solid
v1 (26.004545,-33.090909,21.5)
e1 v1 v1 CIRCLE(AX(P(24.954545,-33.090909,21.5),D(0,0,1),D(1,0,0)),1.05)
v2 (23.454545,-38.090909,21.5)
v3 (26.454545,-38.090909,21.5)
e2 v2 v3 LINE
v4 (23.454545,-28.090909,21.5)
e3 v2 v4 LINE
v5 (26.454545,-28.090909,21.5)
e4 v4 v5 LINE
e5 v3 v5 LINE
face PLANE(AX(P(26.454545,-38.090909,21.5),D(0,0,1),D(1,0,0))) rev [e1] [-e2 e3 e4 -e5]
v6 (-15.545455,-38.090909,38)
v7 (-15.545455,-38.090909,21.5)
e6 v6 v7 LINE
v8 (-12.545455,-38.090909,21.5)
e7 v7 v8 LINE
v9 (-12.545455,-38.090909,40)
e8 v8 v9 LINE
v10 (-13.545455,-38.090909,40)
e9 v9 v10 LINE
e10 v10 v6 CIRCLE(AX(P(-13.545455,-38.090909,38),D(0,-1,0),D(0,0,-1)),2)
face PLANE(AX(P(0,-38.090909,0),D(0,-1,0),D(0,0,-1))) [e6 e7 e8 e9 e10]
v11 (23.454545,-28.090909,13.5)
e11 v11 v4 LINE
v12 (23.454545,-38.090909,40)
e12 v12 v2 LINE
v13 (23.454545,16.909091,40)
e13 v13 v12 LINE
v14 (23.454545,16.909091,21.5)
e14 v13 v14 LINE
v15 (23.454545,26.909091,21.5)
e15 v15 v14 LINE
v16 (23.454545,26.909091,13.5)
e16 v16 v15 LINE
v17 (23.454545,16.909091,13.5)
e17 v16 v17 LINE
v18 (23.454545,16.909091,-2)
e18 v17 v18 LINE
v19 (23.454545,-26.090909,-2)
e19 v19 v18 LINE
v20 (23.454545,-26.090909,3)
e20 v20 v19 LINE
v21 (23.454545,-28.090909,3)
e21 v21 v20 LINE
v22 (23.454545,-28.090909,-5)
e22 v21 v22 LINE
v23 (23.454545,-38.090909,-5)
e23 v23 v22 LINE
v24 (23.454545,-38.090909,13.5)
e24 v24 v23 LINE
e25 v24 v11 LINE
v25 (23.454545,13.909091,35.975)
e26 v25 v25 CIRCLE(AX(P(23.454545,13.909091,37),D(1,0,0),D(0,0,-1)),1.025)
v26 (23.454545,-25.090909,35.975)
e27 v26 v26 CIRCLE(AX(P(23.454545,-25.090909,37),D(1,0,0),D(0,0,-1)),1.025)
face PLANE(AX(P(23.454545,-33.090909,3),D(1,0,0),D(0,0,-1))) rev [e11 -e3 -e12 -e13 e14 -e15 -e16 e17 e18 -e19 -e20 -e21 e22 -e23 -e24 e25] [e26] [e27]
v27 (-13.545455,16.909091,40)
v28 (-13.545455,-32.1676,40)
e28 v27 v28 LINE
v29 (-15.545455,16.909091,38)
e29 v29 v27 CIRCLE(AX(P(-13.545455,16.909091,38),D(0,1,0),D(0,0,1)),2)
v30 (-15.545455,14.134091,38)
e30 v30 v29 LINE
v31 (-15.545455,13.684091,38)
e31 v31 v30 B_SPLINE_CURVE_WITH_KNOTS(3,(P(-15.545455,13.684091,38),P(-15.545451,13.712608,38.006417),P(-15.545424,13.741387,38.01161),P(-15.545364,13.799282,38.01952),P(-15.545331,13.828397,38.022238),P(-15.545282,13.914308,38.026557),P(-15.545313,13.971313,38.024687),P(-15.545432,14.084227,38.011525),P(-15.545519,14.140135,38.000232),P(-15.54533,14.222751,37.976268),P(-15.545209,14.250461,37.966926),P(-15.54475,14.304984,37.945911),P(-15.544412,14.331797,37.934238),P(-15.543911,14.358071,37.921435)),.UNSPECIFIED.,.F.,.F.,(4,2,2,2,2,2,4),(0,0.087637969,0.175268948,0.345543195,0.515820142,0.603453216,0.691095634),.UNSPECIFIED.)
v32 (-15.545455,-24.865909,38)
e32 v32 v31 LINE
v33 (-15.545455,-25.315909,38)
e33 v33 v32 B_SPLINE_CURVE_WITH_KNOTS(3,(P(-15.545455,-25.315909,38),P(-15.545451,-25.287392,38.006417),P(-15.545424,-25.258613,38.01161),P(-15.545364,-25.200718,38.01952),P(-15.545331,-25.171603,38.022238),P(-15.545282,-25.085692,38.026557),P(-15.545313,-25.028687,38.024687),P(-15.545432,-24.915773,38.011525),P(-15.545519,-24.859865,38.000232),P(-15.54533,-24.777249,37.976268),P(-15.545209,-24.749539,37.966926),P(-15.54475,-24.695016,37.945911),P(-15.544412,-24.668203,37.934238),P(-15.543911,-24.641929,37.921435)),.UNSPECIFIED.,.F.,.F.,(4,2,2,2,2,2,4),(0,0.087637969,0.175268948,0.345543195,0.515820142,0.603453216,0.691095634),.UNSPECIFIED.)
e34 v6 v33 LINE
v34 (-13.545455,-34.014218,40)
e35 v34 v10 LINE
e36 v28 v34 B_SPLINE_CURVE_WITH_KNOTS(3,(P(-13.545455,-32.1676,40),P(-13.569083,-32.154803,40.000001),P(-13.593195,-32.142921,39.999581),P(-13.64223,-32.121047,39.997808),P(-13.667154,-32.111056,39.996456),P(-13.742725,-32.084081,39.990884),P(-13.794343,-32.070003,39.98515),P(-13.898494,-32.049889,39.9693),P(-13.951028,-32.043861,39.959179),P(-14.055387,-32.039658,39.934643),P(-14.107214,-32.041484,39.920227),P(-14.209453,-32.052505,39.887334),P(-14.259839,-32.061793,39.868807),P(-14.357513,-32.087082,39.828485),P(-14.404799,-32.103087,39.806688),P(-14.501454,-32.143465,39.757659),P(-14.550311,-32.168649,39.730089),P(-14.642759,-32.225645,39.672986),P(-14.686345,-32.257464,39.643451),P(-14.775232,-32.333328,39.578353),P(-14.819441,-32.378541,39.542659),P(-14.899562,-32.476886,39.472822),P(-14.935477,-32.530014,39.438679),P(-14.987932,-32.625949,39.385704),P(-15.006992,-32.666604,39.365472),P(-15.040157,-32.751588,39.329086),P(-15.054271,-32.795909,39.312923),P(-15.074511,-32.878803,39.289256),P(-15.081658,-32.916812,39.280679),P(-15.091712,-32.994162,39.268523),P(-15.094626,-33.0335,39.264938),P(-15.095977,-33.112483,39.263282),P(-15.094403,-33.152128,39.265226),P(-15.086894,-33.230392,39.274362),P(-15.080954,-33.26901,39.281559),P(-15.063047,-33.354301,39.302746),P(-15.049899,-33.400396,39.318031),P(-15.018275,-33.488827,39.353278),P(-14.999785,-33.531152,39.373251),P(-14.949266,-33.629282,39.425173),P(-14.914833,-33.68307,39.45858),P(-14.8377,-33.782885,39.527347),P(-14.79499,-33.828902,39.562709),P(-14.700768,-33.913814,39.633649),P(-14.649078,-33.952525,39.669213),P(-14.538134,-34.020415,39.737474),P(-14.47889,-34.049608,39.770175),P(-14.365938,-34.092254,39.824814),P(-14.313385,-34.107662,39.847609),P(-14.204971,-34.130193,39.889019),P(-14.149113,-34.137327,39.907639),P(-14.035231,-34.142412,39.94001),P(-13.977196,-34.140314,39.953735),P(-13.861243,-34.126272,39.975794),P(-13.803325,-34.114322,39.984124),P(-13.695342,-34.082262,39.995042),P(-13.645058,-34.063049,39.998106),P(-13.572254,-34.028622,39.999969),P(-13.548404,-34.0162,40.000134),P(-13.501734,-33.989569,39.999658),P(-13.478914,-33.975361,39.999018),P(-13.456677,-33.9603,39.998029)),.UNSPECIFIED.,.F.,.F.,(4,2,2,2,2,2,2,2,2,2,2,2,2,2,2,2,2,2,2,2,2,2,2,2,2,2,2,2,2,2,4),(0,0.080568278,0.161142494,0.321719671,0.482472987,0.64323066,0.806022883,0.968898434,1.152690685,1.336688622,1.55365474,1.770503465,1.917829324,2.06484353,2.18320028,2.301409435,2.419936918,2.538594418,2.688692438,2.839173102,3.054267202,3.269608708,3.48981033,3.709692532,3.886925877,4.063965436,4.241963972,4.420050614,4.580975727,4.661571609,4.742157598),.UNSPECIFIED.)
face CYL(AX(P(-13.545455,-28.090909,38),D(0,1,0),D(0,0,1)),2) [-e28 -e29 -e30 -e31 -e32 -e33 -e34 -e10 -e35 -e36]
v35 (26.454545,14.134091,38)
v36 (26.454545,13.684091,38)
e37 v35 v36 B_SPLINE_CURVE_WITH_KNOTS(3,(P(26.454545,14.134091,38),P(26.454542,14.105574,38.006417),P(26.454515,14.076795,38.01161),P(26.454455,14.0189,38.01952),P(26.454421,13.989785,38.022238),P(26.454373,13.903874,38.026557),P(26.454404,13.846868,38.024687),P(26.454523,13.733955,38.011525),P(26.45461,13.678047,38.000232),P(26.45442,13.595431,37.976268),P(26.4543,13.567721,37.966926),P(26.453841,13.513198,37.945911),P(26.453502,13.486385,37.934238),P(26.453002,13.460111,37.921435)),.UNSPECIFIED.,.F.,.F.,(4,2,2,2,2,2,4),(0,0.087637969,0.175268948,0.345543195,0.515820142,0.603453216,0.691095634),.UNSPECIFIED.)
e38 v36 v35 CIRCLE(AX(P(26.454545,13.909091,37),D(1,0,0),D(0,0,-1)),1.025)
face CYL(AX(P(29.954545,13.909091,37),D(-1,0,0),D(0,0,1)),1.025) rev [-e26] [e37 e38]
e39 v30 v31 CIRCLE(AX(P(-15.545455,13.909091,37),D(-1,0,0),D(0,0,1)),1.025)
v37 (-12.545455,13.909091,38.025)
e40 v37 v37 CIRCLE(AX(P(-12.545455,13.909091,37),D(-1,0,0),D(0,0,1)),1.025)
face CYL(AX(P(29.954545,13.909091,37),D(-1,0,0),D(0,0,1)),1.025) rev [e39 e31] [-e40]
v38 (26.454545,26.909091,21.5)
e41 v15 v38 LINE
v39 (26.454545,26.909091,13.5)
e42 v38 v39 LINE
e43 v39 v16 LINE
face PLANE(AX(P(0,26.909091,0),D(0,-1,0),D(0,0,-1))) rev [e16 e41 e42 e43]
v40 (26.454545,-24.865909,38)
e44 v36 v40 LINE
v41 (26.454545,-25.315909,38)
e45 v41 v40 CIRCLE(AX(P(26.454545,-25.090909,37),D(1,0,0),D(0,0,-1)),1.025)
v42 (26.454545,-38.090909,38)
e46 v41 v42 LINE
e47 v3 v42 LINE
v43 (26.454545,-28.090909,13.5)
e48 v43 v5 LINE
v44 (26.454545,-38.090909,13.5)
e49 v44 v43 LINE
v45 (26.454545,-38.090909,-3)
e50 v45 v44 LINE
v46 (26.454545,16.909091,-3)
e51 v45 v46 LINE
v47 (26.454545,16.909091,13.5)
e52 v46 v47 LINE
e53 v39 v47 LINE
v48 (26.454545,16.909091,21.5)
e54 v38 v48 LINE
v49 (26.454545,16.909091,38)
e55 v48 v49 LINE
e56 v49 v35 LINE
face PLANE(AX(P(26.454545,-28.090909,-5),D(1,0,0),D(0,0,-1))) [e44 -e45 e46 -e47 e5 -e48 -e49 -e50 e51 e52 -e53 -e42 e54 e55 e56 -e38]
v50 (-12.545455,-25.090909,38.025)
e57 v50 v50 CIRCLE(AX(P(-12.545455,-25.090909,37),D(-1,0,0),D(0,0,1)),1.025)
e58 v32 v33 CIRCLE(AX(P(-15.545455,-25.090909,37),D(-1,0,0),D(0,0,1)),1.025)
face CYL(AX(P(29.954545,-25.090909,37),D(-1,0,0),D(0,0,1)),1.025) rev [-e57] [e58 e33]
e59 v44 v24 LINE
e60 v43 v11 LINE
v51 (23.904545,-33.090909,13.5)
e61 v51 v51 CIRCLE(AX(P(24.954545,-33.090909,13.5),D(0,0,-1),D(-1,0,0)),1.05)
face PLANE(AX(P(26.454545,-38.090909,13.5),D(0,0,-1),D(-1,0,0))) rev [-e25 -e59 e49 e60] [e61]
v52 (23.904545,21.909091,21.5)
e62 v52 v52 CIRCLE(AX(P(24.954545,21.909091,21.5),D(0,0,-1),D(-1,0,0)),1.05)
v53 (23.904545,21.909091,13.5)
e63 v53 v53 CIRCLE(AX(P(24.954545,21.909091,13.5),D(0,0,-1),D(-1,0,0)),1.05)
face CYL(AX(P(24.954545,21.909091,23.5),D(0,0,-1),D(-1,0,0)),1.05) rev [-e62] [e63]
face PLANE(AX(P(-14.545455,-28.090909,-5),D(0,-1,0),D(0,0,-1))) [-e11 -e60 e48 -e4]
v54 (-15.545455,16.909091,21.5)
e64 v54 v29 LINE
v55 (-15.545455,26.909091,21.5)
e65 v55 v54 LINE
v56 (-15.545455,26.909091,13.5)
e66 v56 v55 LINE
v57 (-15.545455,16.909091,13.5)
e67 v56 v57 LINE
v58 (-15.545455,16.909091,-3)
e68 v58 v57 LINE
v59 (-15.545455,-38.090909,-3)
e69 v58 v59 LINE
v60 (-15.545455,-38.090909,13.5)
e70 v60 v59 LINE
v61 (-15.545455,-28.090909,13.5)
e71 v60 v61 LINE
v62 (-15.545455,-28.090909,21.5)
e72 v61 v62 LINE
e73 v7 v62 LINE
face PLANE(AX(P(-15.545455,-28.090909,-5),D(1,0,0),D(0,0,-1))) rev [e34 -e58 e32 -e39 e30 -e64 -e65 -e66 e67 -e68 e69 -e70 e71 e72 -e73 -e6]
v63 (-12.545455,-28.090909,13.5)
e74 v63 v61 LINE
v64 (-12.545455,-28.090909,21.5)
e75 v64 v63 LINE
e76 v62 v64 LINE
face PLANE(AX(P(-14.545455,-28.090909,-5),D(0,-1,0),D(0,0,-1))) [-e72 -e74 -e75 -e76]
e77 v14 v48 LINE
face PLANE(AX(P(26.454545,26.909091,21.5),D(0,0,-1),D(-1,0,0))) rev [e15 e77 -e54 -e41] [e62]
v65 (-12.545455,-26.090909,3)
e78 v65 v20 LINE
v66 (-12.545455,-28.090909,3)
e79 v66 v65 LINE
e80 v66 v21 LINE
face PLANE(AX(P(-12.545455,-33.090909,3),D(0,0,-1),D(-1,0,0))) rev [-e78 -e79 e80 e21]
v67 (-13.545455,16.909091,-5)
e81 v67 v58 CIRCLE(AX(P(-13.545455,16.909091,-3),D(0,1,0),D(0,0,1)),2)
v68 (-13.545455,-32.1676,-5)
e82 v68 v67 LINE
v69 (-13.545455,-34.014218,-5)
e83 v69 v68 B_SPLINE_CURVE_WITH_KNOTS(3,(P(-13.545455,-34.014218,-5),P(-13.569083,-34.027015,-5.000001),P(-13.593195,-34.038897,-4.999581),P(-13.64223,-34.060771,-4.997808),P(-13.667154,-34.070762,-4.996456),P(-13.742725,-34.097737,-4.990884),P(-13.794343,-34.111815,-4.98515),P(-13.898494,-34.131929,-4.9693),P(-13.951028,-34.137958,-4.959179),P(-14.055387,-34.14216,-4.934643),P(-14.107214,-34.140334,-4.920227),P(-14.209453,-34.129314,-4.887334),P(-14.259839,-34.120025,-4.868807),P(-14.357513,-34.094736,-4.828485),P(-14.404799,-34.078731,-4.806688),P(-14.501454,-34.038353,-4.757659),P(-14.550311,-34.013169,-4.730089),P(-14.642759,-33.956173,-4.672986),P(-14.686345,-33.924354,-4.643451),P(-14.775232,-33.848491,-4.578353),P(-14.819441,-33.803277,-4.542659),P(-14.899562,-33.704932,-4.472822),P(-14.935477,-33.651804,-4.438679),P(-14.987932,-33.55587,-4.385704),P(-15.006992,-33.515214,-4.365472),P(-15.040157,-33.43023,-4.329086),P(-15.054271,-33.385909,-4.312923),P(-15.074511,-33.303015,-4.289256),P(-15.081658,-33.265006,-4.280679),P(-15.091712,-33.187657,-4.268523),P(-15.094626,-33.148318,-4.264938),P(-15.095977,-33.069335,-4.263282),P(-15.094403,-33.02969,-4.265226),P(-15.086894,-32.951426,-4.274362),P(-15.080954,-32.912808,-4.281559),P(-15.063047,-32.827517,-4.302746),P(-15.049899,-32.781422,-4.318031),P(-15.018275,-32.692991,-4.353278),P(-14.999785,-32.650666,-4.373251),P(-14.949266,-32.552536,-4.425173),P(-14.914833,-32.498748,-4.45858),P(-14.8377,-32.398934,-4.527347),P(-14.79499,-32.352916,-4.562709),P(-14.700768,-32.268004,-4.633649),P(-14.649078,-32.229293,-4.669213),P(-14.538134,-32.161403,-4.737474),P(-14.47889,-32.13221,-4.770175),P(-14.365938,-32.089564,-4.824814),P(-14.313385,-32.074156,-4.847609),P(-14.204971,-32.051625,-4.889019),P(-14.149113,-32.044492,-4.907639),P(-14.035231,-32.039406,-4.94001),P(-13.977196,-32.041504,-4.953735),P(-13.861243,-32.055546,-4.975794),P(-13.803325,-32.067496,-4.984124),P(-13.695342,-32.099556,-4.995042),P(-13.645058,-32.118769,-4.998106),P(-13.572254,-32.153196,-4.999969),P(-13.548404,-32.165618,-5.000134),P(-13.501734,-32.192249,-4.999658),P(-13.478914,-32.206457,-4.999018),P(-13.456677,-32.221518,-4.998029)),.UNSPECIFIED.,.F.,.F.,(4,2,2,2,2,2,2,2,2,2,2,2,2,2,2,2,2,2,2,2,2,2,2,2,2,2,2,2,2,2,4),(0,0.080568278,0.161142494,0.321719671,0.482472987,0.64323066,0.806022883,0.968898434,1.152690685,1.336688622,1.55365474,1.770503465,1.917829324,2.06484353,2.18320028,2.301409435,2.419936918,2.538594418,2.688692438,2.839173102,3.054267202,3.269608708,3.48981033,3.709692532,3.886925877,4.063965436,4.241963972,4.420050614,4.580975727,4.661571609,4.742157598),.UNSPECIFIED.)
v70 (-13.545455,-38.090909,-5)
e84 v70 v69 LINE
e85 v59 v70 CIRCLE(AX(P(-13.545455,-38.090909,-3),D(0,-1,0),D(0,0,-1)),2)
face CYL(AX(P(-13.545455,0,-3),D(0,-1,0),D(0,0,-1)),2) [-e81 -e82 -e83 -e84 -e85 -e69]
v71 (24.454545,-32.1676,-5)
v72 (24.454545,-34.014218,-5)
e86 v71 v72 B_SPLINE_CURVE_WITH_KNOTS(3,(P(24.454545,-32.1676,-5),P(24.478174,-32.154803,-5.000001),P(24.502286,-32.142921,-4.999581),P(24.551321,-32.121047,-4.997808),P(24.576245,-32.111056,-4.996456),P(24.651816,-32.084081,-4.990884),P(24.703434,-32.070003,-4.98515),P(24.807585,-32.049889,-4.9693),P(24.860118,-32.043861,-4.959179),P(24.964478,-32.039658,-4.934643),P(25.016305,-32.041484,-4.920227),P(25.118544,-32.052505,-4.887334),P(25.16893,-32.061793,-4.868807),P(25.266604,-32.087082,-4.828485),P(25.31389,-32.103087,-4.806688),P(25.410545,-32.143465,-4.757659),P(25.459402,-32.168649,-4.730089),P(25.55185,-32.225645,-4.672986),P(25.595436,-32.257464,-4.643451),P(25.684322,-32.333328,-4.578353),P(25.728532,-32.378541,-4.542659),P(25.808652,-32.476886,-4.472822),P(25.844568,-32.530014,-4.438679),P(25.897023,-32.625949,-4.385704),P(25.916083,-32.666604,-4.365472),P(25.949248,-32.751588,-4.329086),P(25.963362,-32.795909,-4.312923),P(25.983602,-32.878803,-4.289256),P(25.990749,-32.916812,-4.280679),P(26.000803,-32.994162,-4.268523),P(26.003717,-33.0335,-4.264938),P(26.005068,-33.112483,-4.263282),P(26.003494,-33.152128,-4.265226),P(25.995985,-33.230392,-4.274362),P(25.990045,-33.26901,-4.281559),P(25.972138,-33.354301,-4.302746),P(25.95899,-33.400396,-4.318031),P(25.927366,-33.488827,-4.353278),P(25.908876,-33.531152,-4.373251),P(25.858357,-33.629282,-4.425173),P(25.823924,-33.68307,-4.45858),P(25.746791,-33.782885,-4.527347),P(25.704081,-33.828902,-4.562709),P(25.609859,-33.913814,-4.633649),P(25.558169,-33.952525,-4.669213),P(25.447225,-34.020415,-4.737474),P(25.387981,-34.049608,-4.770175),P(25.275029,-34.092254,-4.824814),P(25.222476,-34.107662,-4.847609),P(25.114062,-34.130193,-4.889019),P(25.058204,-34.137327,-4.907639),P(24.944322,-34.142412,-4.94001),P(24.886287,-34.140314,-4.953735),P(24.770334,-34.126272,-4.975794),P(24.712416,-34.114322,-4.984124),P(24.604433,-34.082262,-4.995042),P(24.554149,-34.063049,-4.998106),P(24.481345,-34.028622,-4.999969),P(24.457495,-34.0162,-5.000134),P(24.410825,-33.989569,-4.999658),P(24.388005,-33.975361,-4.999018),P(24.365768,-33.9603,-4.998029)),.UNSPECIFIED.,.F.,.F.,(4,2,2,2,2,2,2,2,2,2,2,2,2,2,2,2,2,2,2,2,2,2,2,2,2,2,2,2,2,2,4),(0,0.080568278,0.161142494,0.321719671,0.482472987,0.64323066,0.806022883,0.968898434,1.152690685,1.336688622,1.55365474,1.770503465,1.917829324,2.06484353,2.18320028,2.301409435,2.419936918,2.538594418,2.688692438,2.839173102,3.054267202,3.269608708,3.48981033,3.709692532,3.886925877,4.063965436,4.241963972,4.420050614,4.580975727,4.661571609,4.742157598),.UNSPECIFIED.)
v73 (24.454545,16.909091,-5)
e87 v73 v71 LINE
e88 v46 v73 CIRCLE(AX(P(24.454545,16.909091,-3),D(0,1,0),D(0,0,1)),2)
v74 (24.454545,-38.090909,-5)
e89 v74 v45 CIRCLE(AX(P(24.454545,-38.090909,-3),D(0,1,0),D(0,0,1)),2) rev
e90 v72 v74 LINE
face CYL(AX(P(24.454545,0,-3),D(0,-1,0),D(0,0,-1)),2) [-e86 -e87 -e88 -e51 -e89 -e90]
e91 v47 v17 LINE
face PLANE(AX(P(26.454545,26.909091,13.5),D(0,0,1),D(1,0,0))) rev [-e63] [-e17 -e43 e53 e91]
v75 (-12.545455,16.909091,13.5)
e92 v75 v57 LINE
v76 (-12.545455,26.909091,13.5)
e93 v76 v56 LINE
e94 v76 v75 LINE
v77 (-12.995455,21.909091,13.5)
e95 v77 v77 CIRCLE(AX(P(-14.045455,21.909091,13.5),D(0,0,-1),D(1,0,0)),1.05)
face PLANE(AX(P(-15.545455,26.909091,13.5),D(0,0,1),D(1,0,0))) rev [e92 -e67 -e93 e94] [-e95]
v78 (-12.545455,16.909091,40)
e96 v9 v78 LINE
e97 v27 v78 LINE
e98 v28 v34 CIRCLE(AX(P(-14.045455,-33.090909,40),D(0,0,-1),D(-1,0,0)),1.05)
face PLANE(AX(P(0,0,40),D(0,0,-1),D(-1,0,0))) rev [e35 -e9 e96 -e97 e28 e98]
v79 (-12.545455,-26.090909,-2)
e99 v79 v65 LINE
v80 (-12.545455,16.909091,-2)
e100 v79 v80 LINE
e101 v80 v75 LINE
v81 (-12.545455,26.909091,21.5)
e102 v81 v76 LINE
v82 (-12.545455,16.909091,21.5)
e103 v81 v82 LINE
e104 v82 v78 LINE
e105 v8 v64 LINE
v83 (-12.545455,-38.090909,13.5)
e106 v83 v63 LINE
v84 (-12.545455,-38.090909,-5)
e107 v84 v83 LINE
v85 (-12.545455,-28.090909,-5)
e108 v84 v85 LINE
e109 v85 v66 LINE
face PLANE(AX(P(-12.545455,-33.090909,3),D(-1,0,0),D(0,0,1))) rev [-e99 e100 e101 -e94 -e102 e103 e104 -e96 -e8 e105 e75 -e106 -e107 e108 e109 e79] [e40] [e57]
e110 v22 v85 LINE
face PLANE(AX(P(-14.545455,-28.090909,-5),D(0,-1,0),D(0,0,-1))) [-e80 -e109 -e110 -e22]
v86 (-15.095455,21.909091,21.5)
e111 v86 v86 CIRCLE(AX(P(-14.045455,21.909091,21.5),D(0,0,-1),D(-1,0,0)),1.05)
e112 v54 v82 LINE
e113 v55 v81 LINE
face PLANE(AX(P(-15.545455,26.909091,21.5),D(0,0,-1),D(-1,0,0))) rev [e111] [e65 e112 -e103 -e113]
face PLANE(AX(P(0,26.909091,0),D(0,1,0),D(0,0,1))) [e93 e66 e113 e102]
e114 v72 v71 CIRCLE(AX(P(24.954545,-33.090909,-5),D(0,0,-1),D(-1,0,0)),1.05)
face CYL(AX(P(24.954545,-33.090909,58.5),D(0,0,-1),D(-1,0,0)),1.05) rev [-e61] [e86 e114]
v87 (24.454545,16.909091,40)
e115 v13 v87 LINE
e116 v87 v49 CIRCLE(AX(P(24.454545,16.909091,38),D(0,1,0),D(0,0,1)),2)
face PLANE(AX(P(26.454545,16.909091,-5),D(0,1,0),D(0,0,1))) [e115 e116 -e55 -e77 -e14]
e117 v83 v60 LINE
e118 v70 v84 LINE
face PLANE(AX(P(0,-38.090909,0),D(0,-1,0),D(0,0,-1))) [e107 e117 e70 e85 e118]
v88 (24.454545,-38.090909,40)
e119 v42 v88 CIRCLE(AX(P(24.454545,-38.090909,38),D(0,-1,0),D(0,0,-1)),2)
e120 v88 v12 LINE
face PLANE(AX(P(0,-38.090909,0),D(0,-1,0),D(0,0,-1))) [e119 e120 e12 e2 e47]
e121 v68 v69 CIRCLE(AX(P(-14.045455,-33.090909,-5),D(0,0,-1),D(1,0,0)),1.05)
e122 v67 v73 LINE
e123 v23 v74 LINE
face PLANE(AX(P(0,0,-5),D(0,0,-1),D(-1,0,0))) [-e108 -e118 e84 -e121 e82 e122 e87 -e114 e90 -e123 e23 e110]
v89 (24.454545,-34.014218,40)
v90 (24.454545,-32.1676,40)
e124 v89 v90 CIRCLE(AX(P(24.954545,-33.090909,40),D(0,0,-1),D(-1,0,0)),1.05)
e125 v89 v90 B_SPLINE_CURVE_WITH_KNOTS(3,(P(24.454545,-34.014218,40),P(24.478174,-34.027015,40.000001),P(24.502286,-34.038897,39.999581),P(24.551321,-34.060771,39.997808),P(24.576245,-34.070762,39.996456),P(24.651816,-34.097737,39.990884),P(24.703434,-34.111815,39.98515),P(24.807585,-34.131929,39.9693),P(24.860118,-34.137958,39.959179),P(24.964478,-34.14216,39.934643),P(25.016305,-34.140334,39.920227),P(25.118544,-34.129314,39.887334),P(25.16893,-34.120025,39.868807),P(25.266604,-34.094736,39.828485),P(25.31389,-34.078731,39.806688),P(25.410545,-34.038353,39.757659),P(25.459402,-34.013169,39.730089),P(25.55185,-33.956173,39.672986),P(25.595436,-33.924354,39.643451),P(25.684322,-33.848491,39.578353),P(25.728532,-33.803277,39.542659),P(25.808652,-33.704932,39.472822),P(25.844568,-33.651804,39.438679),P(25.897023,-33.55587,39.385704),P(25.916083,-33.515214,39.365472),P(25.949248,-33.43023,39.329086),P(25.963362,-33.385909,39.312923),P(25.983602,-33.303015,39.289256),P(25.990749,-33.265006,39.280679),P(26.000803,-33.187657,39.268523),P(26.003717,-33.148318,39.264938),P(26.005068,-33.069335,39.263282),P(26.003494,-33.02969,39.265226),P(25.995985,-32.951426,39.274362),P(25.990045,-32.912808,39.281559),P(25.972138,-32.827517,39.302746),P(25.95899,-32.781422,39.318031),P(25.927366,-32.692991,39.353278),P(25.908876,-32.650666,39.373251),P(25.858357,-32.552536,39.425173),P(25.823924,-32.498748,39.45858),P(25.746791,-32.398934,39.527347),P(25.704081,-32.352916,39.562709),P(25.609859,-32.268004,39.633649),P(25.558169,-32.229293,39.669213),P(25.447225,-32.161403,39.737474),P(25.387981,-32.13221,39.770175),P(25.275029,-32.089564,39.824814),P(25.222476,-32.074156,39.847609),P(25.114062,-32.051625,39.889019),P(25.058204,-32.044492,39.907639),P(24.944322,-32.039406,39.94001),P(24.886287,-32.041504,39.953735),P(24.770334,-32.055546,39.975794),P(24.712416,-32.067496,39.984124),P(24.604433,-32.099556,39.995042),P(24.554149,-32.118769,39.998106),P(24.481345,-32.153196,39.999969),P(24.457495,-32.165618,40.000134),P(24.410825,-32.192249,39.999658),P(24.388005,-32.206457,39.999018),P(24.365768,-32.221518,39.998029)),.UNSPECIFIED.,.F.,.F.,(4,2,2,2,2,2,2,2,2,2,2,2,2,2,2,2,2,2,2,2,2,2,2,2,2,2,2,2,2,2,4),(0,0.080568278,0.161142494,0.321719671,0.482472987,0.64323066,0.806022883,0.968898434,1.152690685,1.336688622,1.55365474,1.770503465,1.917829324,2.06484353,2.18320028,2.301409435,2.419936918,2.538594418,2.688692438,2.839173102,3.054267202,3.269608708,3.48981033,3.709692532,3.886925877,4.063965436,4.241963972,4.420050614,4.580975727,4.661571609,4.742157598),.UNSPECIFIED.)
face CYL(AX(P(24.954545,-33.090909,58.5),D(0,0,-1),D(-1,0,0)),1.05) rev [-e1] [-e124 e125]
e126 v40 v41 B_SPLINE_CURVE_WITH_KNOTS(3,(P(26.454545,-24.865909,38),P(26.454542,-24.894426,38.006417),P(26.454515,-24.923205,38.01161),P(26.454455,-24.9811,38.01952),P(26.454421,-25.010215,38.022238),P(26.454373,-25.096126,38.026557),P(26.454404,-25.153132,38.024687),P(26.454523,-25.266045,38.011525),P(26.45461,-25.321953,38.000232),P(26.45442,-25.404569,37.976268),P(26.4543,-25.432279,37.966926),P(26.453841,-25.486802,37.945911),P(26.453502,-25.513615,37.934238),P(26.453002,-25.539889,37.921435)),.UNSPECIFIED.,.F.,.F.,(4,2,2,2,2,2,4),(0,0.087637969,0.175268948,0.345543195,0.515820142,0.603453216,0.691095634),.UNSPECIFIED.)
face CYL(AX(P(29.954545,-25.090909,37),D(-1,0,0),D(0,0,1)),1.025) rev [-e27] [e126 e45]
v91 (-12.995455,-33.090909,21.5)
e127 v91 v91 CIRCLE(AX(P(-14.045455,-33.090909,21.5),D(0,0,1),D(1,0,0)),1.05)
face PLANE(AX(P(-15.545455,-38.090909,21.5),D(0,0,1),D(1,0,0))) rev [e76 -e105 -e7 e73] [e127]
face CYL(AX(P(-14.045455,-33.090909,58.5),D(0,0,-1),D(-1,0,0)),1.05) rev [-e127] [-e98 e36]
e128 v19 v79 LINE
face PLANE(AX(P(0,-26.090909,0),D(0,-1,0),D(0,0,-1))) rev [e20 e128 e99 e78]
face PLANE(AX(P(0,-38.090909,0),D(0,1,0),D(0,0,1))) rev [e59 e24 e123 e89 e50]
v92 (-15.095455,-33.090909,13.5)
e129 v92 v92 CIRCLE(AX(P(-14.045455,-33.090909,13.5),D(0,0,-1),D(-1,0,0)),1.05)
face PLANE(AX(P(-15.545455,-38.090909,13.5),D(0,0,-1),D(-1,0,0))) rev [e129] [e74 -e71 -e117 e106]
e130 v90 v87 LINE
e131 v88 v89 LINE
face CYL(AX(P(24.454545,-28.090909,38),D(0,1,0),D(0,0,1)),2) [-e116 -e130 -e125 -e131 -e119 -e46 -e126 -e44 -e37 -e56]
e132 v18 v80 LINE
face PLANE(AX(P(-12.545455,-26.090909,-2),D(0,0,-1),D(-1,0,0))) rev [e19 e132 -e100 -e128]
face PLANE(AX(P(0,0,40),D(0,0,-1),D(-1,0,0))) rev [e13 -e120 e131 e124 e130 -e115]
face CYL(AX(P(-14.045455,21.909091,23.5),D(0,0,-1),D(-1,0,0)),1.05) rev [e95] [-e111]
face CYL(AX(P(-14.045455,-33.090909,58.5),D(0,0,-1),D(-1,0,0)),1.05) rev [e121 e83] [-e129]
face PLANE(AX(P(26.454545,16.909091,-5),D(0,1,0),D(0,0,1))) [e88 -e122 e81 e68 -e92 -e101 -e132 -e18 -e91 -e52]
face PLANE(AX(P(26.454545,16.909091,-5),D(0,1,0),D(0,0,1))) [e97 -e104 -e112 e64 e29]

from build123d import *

# Parameters (mm, degrees)
EXTRUDE_1_DEPTH      = 40
EXTRUDE_1_DEPTH_BACK = 5
SKETCH_2_W           = 36
SKETCH_2_H           = 37
CUT_EXTRUDE_1_DEPTH  = 50
SKETCH_5_W           = 36
SKETCH_5_H           = 5
CUT_EXTRUDE_4_DEPTH  = 43
SKETCH_9_R           = 1.025
CUT_EXTRUDE_5_DEPTH  = 45.5
SKETCH_10_W          = 3
SKETCH_10_H          = 8
EXTRUDE_4_DEPTH      = 10
SKETCH_11_W          = 3
SKETCH_11_H          = 18.5
EXTRUDE_5_DEPTH      = 10
SKETCH_12_R          = 1.05
CUT_EXTRUDE_6_DEPTH  = 10
SKETCH_13_R          = 1.05
CUT_EXTRUDE_7_DEPTH  = 63.5
FILLET_4_R           = 2
FILLET_5_R           = 2
FILLET_6_R           = 2
FILLET_7_R           = 2


with BuildPart() as part:
    # 草圖1 → 填料-伸長1 (new, two sides: drawn at the far end of the back side and taken through both)
    with BuildSketch(Plane.XY.offset(-EXTRUDE_1_DEPTH_BACK)):
        Polygon((-14.545454545, -28.090909091), (-15.545454545, -28.090909091), (-15.545454545, 16.909090909), (-14.545454545, 16.909090909), (25.454545455, 16.909090909), (26.454545455, 16.909090909), (26.454545455, -28.090909091), (25.454545455, -28.090909091), align=None)
    extrude(amount=EXTRUDE_1_DEPTH + EXTRUDE_1_DEPTH_BACK)

    # 草圖2 → 除料-伸長1 (cut)
    with BuildSketch(Plane(origin=(0, 16.909090909, 0), x_dir=(1, 0, 0), z_dir=(0, 1, 0))):
        with Locations((5.454545455, -21.5)):
            Rectangle(SKETCH_2_W, SKETCH_2_H)
    extrude(amount=-CUT_EXTRUDE_1_DEPTH, mode=Mode.SUBTRACT)

    # 草圖5 → 除料-伸長4 (cut)
    with BuildSketch(Plane(origin=(0, 16.909090909, 0), x_dir=(1, 0, 0), z_dir=(0, 1, 0))):
        with Locations((5.454545455, -0.5)):
            Rectangle(SKETCH_5_W, SKETCH_5_H)
    extrude(amount=-CUT_EXTRUDE_4_DEPTH, mode=Mode.SUBTRACT)

    # 草圖9 → 除料-伸長5 (cut)
    with BuildSketch(Plane.ZY.offset(15.545454545)):
        with Locations(Location((37, -25.090909091, 0), (0, 0, 180))):
            Circle(SKETCH_9_R)
        with Locations(Location((37, 13.909090909, 0), (0, 0, 180))):
            Circle(SKETCH_9_R)
    extrude(amount=-CUT_EXTRUDE_5_DEPTH, mode=Mode.SUBTRACT)

    # 草圖10 → 填料-伸長4 (add)
    with BuildSketch(Plane(origin=(0, 16.909090909, 0), x_dir=(1, 0, 0), z_dir=(0, 1, 0))):
        with Locations((-14.045454545, -17.5)):
            Rectangle(SKETCH_10_W, SKETCH_10_H)
        with Locations((24.954545455, -17.5)):
            Rectangle(SKETCH_10_W, SKETCH_10_H)
    extrude(amount=EXTRUDE_4_DEPTH)

    # 草圖11 → 填料-伸長5 (add)
    with BuildSketch(Plane(origin=(0, -28.090909091, 0), x_dir=(-1, 0, 0), z_dir=(0, -1, 0))):
        with Locations((-24.954545455, -30.75)):
            Rectangle(SKETCH_11_W, SKETCH_11_H)
        with Locations((-24.954545455, -4.25)):
            Rectangle(SKETCH_11_W, SKETCH_11_H)
        with Locations((14.045454545, -30.75)):
            Rectangle(SKETCH_11_W, SKETCH_11_H)
        with Locations((14.045454545, -4.25)):
            Rectangle(SKETCH_11_W, SKETCH_11_H)
    extrude(amount=EXTRUDE_5_DEPTH)

    # 草圖12 → 除料-伸長6 (cut)
    with BuildSketch(Plane(origin=(0, 0, 13.5), x_dir=(-1, 0, 0), z_dir=(0, 0, -1))):
        with Locations((-24.954545455, 21.909090909)):
            Circle(SKETCH_12_R)
        with Locations((14.045454545, 21.909090909)):
            Circle(SKETCH_12_R)
    extrude(amount=-CUT_EXTRUDE_6_DEPTH, mode=Mode.SUBTRACT)

    # 草圖13 → 除料-伸長7 (cut)
    with BuildSketch(Plane(origin=(0, 0, -5), x_dir=(-1, 0, 0), z_dir=(0, 0, -1))):
        with Locations((-24.954545455, -33.090909091)):
            Circle(SKETCH_13_R)
        with Locations((14.045454545, -33.090909091)):
            Circle(SKETCH_13_R)
    extrude(amount=-CUT_EXTRUDE_7_DEPTH, mode=Mode.SUBTRACT)

    # 圓角4
    # the kernel refuses this fillet: 2 mm, written as the material it takes off along each edge
    with BuildSketch(Plane(origin=(26.454545455, 21.909090909, -5), x_dir=(-1, 0, 0), z_dir=(0, -1, 0))) as fillet_4_piece_1:
        with BuildLine():
            CenterArc((FILLET_4_R, -FILLET_4_R), FILLET_4_R, 90, 90)
            Line((0, -FILLET_4_R), (0, 0))
            Line((0, 0), (FILLET_4_R, 0))
        make_face()
    extrude(amount=65, mode=Mode.SUBTRACT)

    # 圓角5
    # the kernel refuses this fillet: 2 mm, written as the material it takes off along each edge
    with BuildSketch(Plane(origin=(-15.545454545, 21.909090909, -5), x_dir=(0, 0, 1), z_dir=(0, -1, 0))) as fillet_5_piece_1:
        with BuildLine():
            CenterArc((FILLET_5_R, -FILLET_5_R), FILLET_5_R, 90, 90)
            Line((0, -FILLET_5_R), (0, 0))
            Line((0, 0), (FILLET_5_R, 0))
        make_face()
    extrude(amount=65, mode=Mode.SUBTRACT)

    # 圓角6
    # the kernel refuses this fillet: 2 mm, written as the material it takes off along each edge
    with BuildSketch(Plane(origin=(26.454545455, 21.909090909, 40), x_dir=(0, 0, -1), z_dir=(0, -1, 0))) as fillet_6_piece_1:
        with BuildLine():
            CenterArc((FILLET_6_R, -FILLET_6_R), FILLET_6_R, 90, 90)
            Line((0, -FILLET_6_R), (0, 0))
            Line((0, 0), (FILLET_6_R, 0))
        make_face()
    extrude(amount=65, mode=Mode.SUBTRACT)

    # 圓角7
    # the kernel refuses this fillet: 2 mm, written as the material it takes off along each edge
    with BuildSketch(Plane(origin=(-15.545454545, -43.090909091, 40), x_dir=(0, 0, -1), z_dir=(0, 1, 0))) as fillet_7_piece_1:
        with BuildLine():
            CenterArc((FILLET_7_R, -FILLET_7_R), FILLET_7_R, 90, 90)
            Line((0, -FILLET_7_R), (0, 0))
            Line((0, 0), (FILLET_7_R, 0))
        make_face()
    extrude(amount=65, mode=Mode.SUBTRACT)


solid = part.part
